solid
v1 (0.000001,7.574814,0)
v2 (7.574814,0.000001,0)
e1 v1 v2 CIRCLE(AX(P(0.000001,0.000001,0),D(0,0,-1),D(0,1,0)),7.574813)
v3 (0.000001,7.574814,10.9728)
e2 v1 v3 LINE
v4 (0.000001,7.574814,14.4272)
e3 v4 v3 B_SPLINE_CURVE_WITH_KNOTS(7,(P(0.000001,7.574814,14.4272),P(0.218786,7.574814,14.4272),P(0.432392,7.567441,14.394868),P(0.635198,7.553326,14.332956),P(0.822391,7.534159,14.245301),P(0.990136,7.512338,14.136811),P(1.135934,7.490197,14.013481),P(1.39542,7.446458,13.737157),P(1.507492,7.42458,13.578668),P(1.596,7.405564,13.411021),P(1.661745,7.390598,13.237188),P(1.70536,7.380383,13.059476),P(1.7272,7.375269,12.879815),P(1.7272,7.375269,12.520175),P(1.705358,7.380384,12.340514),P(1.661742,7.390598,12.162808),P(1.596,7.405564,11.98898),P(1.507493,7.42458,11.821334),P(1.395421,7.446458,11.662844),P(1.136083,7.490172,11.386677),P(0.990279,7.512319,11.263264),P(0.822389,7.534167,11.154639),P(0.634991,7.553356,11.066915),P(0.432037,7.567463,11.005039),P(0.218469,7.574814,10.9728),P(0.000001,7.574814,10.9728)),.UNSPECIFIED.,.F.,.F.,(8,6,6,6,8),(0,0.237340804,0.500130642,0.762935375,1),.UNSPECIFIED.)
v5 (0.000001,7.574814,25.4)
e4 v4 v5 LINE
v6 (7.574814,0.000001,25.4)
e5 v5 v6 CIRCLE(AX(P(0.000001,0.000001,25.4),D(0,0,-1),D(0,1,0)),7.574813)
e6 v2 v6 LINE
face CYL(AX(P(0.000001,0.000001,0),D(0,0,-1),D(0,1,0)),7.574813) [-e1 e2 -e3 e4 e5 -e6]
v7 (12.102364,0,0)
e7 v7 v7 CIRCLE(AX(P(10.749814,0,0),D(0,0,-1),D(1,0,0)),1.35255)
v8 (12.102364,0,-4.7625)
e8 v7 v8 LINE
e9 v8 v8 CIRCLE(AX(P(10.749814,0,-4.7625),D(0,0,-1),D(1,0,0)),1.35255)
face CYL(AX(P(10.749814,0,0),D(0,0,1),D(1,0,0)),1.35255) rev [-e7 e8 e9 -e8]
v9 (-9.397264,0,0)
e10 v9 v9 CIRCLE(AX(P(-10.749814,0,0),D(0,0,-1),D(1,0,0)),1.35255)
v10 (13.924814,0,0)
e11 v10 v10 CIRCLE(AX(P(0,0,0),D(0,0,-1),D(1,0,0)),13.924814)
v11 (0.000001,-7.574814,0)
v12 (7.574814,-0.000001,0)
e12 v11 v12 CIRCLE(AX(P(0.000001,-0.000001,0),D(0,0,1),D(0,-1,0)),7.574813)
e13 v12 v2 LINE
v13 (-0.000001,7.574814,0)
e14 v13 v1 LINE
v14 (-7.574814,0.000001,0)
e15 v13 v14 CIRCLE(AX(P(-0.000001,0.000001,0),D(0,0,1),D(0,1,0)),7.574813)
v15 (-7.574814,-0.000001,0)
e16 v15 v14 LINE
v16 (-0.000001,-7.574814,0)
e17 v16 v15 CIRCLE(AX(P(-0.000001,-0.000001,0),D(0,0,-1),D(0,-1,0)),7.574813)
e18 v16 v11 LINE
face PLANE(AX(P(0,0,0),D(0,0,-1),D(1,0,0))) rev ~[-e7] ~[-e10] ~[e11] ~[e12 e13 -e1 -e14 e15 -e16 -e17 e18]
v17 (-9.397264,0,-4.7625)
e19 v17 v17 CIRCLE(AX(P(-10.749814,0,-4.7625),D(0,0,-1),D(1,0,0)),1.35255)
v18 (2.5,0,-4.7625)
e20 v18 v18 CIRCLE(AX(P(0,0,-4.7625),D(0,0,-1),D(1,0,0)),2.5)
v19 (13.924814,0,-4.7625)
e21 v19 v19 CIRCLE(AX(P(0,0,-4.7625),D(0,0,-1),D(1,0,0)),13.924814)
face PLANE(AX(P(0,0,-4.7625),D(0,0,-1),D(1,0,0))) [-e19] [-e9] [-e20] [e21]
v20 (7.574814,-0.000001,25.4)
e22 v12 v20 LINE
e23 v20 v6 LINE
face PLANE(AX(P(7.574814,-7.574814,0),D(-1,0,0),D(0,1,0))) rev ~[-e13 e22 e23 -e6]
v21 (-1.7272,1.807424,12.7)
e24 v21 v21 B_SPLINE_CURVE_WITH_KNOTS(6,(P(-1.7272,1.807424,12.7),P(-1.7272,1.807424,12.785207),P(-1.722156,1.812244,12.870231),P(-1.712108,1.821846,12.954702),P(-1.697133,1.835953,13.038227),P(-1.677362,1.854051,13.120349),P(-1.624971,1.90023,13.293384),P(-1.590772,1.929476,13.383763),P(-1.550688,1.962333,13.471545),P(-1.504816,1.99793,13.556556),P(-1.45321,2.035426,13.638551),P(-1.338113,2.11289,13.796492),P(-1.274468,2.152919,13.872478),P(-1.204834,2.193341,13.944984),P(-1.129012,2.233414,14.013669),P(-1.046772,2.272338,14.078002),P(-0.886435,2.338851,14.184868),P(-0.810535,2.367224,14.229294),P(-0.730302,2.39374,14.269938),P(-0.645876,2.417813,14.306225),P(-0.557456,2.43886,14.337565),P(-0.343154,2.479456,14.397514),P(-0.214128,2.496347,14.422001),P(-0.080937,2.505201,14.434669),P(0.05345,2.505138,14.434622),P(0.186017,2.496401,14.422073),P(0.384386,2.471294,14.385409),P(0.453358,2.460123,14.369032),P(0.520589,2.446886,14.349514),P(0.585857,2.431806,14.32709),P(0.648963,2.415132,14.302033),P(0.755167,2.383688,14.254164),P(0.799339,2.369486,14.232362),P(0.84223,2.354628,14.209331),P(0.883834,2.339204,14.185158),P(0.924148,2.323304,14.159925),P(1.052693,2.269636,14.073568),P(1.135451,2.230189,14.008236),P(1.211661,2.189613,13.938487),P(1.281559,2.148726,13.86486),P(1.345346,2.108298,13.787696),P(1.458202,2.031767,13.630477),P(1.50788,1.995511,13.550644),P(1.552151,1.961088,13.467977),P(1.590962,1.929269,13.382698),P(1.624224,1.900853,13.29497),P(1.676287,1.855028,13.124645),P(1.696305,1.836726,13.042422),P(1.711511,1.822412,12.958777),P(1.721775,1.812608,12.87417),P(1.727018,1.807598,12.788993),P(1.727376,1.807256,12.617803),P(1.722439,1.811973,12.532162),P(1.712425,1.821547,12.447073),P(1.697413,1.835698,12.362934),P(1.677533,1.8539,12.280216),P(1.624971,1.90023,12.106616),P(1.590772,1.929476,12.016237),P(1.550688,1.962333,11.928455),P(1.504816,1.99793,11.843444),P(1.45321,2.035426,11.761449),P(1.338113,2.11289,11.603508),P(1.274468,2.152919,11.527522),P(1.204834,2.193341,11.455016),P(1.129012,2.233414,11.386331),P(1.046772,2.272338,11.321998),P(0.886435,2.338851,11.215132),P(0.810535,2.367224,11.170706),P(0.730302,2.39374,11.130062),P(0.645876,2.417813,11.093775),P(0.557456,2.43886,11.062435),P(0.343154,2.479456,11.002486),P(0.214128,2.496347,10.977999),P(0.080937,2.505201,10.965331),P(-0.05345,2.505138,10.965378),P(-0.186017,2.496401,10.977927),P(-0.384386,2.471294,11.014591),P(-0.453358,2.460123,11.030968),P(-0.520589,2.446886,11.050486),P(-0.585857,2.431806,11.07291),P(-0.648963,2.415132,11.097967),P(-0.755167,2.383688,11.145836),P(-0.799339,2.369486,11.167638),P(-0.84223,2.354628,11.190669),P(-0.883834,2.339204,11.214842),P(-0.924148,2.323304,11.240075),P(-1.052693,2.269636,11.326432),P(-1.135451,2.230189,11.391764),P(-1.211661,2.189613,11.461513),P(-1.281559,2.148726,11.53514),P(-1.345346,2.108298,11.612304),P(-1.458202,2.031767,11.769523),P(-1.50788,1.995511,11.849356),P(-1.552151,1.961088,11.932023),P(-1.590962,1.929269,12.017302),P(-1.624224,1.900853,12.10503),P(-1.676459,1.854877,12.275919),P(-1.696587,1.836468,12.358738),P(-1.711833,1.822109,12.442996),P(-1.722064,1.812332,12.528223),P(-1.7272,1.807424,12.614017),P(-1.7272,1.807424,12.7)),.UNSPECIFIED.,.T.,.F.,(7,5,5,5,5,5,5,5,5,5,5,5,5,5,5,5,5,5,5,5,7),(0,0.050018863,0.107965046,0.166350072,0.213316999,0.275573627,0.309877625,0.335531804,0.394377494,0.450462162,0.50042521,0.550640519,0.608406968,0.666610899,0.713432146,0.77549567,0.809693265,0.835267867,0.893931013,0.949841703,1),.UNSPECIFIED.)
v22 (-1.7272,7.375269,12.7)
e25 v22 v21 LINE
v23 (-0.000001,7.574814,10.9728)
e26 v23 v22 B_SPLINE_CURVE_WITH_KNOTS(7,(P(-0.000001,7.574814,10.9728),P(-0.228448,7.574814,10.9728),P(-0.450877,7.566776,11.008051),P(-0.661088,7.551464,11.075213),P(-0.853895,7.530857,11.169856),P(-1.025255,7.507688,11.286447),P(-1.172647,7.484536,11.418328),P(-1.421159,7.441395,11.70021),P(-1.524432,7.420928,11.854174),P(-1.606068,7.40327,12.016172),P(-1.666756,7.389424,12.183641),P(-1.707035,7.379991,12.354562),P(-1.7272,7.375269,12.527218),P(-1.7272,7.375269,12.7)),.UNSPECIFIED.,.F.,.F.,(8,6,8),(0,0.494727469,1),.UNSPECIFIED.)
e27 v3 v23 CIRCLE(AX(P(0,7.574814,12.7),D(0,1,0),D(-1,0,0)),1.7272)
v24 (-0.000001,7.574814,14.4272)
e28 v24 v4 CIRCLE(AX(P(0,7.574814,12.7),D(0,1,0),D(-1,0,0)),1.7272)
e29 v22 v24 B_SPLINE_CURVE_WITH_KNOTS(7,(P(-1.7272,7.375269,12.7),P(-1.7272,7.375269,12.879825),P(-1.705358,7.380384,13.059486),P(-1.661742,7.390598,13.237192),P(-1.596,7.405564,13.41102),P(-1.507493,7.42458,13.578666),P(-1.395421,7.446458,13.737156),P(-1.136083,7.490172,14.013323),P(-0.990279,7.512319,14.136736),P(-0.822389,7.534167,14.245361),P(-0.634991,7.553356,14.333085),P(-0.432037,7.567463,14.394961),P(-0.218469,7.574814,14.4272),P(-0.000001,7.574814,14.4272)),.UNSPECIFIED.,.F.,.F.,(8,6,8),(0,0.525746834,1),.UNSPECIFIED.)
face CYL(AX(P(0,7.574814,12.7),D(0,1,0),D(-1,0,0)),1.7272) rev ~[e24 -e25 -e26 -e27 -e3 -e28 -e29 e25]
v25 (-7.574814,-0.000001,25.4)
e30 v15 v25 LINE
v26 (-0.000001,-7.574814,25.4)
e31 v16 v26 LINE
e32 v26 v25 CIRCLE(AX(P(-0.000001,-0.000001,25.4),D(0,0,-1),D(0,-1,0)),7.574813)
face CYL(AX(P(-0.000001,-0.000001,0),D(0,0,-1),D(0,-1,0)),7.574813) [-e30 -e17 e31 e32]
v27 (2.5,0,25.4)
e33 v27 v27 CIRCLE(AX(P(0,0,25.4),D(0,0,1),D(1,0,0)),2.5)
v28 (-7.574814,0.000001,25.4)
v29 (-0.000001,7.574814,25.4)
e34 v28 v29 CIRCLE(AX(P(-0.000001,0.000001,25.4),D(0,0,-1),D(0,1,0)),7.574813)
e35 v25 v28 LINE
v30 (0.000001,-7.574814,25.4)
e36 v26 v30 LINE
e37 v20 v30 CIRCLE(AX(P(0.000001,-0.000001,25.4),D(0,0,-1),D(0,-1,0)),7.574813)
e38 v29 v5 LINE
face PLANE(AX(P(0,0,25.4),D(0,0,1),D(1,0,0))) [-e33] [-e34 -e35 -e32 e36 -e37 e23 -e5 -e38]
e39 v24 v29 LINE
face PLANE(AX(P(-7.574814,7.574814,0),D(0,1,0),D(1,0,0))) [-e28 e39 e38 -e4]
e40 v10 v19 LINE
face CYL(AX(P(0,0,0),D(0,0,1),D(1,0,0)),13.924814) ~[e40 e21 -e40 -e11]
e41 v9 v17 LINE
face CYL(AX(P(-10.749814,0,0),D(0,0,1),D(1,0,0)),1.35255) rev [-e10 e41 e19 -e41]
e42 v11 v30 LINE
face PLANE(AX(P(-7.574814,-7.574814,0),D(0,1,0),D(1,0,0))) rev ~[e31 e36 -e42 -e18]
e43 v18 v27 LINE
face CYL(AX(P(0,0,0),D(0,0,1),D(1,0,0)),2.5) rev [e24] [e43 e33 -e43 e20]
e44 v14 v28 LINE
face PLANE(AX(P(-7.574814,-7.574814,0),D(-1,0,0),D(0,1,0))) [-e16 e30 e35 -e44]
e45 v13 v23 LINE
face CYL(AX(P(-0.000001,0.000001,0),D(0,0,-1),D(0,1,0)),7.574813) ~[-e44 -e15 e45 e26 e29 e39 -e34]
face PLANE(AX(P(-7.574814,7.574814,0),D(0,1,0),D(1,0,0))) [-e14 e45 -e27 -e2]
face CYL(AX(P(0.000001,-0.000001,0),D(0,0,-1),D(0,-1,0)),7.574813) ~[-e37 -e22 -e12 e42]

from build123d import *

# Parameters (mm, degrees)
F0_W        = 15.1496281502
F0_H        = 15.1496281502
F0_R        = 2.5
F1_DEPTH    = 25.4
F2_R        = 1.7272
F3_REACH    = 20.0358874801
F4_R        = 13.9248140751
F4_R_2      = 1.35255
F4_R_3      = 2.5
F5_DEPTH    = 4.7625
F6_T1_DEPTH = 44.3370335


# Not quite as in the source:
# - a fillet or chamfer that OpenCascade refuses, or shapes differently, is made with other operations: its cross-section is extruded or revolved along the edge and cut away or added


with BuildPart() as f1:
    # F0 (on Top) → F1 (new body)
    with BuildSketch(Plane.XY):
        Rectangle(F0_W, F0_H)
        Circle(F0_R, mode=Mode.SUBTRACT)
    extrude(amount=F1_DEPTH)

    f3_end = f1.faces().sort_by_distance((-2.5, 0, 12.7))[0]
    # F2 (on face) → F3 (cut, up to a face of the model that its end follows)
    with BuildSketch(Plane(origin=(0, 7.5748140751, 0), x_dir=(-1, 0, 0), z_dir=(0, 1, 0))):
        with Locations((0, 12.7)):
            Circle(F2_R)
    f3_long = extrude(amount=-F3_REACH, mode=Mode.PRIVATE)
    add(split(f3_long, bisect_by=f3_end, keep=Keep.ALL, mode=Mode.PRIVATE).solids().sort_by_distance((0, 7.5748140751, 12.7))[0], mode=Mode.SUBTRACT)

    # F4 (on face) → F5 (join)
    with BuildSketch(Plane(origin=(0, 0, 0), x_dir=(1, 0, 0), z_dir=(0, 0, -1))):
        Circle(F4_R)
        with Locations((-10.7498140751, 0)):
            Circle(F4_R_2, mode=Mode.SUBTRACT)
        Circle(F4_R_3, mode=Mode.SUBTRACT)
        with Locations((10.7498140751, 0)):
            Circle(F4_R_2, mode=Mode.SUBTRACT)
    extrude(amount=F5_DEPTH)

    # F6: fillet of radius 7.5748134 on 4 edges, made by hand

    # F6_s2 → F6_t1 (cut)
    with BuildSketch(Plane.XY):
        with BuildLine():
            ThreePointArc((-6.751e-07, 7.5748140751), (-5.3562025965, 5.3562025965), (-7.5748140751, 6.751e-07))
            Line((-7.5748140751, 6.751e-07), (-7.5748140751, 7.5748140751))
            Line((-7.5748140751, 7.5748140751), (-6.751e-07, 7.5748140751))
        make_face()
        with BuildLine():
            ThreePointArc((6.751e-07, 7.5748140751), (5.3562025965, 5.3562025965), (7.5748140751, 6.751e-07))
            Line((7.5748140751, 6.751e-07), (7.5748140751, 7.5748140751))
            Line((7.5748140751, 7.5748140751), (6.751e-07, 7.5748140751))
        make_face()
        with BuildLine():
            ThreePointArc((-6.751e-07, -7.5748140751), (-5.3562025965, -5.3562025965), (-7.5748140751, -6.751e-07))
            Line((-7.5748140751, -6.751e-07), (-7.5748140751, -7.5748140751))
            Line((-7.5748140751, -7.5748140751), (-6.751e-07, -7.5748140751))
        make_face()
        with BuildLine():
            ThreePointArc((6.751e-07, -7.5748140751), (5.3562025965, -5.3562025965), (7.5748140751, -6.751e-07))
            Line((7.5748140751, -6.751e-07), (7.5748140751, -7.5748140751))
            Line((7.5748140751, -7.5748140751), (6.751e-07, -7.5748140751))
        make_face()
    extrude(amount=F6_T1_DEPTH, mode=Mode.SUBTRACT)


solid = f1.part
